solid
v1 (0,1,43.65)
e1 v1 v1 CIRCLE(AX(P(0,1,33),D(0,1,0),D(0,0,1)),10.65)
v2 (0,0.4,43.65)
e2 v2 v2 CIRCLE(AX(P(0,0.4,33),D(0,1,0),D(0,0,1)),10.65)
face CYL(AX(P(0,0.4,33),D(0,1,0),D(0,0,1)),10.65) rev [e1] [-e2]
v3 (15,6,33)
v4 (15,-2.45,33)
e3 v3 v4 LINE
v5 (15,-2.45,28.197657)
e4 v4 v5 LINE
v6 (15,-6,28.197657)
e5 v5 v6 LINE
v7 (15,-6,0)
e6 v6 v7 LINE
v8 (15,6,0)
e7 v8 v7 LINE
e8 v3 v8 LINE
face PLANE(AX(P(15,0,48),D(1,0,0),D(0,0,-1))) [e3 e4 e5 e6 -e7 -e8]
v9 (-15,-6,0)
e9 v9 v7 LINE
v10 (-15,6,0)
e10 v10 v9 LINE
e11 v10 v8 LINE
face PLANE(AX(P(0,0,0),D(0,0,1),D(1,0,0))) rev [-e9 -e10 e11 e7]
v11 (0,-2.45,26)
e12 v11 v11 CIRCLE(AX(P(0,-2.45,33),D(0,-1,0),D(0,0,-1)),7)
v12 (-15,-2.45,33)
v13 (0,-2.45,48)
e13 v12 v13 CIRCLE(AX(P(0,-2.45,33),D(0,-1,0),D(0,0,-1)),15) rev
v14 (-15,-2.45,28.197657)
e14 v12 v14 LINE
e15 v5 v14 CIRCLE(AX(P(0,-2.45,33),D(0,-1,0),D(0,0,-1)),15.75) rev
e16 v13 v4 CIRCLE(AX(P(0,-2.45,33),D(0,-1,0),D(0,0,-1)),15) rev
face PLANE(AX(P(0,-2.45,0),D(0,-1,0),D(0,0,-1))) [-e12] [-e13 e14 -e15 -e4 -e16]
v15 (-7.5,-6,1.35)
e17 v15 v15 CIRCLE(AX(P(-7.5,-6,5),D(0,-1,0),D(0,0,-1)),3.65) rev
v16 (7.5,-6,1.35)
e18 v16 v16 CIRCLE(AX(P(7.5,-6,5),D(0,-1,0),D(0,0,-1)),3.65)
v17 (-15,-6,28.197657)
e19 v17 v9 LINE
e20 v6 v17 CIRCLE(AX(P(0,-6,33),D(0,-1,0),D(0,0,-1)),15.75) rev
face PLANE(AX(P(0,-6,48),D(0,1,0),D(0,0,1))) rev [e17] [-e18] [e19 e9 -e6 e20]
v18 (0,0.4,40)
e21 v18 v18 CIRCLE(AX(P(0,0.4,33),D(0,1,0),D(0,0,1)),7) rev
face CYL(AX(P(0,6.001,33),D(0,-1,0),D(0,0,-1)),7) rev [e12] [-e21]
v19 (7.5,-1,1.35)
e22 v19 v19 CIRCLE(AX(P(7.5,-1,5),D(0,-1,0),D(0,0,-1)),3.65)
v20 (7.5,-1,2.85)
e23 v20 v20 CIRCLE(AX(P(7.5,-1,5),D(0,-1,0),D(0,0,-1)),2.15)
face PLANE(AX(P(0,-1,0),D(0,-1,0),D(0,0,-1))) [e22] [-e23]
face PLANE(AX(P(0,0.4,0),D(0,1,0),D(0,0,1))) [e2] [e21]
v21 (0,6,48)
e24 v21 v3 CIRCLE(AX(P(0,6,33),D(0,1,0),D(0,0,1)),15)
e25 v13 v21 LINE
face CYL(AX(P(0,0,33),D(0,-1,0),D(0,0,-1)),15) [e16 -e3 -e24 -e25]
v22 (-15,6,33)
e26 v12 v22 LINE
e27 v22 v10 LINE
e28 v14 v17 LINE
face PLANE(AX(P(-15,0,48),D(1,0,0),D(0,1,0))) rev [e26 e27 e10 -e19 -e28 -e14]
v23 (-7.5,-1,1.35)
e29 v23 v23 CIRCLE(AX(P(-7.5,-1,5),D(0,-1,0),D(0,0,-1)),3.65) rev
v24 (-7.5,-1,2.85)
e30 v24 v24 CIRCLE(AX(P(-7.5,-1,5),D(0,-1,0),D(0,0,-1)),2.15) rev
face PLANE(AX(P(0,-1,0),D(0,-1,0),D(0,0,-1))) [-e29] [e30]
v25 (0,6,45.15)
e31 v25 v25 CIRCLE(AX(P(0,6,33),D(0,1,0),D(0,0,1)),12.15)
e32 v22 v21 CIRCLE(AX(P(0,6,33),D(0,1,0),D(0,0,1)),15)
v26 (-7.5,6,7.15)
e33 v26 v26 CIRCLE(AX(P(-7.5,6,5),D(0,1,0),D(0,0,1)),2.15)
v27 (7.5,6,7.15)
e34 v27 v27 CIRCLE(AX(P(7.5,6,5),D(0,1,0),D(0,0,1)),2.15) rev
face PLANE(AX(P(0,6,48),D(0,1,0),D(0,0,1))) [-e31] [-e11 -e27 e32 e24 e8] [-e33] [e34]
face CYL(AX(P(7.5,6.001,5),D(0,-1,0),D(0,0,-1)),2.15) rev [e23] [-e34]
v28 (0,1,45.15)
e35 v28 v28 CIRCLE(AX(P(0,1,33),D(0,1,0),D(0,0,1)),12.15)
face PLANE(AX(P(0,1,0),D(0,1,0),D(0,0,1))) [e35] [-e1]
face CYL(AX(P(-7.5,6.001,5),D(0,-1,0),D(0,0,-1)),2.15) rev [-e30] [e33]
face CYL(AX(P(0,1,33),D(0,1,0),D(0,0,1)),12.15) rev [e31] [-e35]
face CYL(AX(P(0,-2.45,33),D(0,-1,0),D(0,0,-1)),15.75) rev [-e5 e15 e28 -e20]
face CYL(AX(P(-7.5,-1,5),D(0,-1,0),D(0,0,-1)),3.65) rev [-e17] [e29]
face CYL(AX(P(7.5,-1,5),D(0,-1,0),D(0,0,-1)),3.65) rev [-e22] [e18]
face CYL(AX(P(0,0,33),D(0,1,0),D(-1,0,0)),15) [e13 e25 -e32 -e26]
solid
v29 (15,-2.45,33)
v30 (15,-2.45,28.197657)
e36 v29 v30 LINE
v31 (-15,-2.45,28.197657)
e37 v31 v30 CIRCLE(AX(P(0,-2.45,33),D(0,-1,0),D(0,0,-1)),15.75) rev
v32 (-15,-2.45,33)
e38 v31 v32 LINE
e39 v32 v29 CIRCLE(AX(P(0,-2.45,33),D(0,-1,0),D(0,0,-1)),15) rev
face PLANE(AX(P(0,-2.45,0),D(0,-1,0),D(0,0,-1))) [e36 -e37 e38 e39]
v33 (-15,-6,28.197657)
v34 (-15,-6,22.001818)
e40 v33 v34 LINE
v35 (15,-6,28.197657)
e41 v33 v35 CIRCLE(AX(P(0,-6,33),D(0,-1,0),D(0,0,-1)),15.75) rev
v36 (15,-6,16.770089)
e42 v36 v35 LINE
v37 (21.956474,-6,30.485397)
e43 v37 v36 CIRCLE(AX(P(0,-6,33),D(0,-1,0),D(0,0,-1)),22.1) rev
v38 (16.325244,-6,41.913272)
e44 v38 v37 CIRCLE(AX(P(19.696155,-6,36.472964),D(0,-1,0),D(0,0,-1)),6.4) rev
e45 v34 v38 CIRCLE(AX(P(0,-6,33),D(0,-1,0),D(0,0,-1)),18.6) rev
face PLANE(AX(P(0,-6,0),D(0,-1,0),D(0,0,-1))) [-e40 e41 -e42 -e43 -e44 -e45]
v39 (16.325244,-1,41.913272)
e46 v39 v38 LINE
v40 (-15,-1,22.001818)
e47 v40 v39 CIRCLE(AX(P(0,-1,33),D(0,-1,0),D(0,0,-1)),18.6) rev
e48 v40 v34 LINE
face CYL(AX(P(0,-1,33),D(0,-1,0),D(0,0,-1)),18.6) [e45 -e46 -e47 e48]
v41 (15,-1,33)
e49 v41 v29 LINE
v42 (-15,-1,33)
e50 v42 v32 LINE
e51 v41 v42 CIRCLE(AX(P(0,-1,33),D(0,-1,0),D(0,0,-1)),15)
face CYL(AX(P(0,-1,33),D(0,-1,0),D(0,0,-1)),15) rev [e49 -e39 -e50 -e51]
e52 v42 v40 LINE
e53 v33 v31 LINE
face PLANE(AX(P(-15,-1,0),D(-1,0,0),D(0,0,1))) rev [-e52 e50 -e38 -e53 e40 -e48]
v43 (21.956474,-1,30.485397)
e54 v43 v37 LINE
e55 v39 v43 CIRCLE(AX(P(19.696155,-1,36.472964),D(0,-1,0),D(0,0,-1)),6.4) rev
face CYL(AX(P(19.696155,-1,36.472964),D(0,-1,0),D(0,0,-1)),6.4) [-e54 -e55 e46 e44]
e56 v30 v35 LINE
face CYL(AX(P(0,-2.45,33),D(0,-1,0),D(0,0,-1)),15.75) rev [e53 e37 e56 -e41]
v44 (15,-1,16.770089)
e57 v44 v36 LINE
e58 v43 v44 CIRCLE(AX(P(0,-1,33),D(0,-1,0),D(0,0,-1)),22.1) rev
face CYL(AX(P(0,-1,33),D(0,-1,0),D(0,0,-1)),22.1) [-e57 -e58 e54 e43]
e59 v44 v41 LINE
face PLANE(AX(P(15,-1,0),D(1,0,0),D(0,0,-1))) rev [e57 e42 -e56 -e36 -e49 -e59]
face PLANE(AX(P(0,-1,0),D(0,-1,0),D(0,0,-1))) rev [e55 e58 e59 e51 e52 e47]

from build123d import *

# Parameters (mm, degrees)
EXTRUDE_873_DEPTH      = 48
FILLET_1_R             = 15
SKETCH_2533_R          = 1
EXTRUDE_4839_DEPTH     = 5
SKETCH_1_4_R           = 15.75
CUT_EXTRUDE_5054_DEPTH = 3.55
SKETCH_1_5_R           = 2.15
SKETCH_1_5_R_2         = 7
CUT_EXTRUDE_5752_DEPTH = 12
SKETCH_5896_R          = 12.15
SKETCH_5896_R_2        = 10.65
CUT_EXTRUDE_6261_DEPTH = 5
SKETCH_2_3_R           = 10.65
CUT_EXTRUDE_6307_DEPTH = 5.6
SKETCH_7_R             = 2.15
SKETCH_7_R_2           = 3.65
CUT_EXTRUDE_6391_DEPTH = 5


with BuildPart() as part:
    # Sketch 353 → Extrude 873 (new body)
    with BuildSketch(Plane.XY):
        Polygon((-1e-08, 3.5), (-15, 3.5), (-15, -6), (15, -6), (15, 3.5), align=None)
        with BuildLine():
            Line((-15, 6), (-15, 3.5))
            Line((-15, 3.5), (-1e-08, 3.5))
            ThreePointArc((-1e-08, 3.5), (-4.330127024, 4.138593385), (-8.291561976, 6))
            Line((-8.291561976, 6), (-15, 6))
        make_face()
        with BuildLine():
            ThreePointArc((-8.291561976, 6), (-4.330127024, 4.138593385), (-1e-08, 3.5))
            ThreePointArc((-1e-08, 3.5), (4.330127014, 4.138593382), (8.291561976, 6))
            Line((8.291561976, 6), (-8.291561976, 6))
        make_face()
        with BuildLine():
            ThreePointArc((8.291561976, 6), (4.330127014, 4.138593382), (-1e-08, 3.5))
            Line((-1e-08, 3.5), (15, 3.5))
            Line((15, 3.5), (15, 6))
            Line((15, 6), (8.291561976, 6))
        make_face()
    extrude(amount=EXTRUDE_873_DEPTH)

    # Скругление1
    fillet_1_edges = [part.edges().sort_by_distance(p)[0] for p in [
        (-15, 0, 48),
        (15, 0, 48),
    ]]
    fillet(fillet_1_edges, radius=FILLET_1_R - 0.0001)  # a hair under: the kernel refuses the full size


with BuildPart() as body_2:
    # Sketch 2533 → Extrude 4839 (new body)
    # profile 1 of 5: a face of its own
    with BuildSketch(Plane.XZ.offset(6)):
        with BuildLine():
            Line((-15, 22.001818332), (-15, 23.793480571))
            ThreePointArc((-15, 23.793480571), (-8.310689955, 48.514265451), (15.975091459, 40.386234011))
            ThreePointArc((15.975091459, 40.386234011), (24.423228184, 39.083476852), (21.026417078, 31.239379412))
            ThreePointArc((21.026417078, 31.239379412), (19.163501403, 24.169925597), (15, 18.160525616))
            Line((15, 18.160525616), (15, 16.770089341))
            ThreePointArc((15, 16.770089341), (19.709709926, 23.003133759), (21.956474455, 30.485396749))
            ThreePointArc((21.956474455, 30.485396749), (25.437011886, 39.301843704), (16.325243686, 41.913272047))
            ThreePointArc((16.325243686, 41.913272047), (-9.977753503, 48.697274764), (-15, 22.001818332))
        make_face()
    # profile 2 of 5: a face of its own
    with BuildSketch(Plane.XZ.offset(6)):
        with BuildLine():
            Line((-15, 23.793480571), (-15, 28.197656822))
            ThreePointArc((-15, 28.197656822), (-2.430277762, 48.561370441), (15.75, 33))
            ThreePointArc((15.75, 33), (15.561370441, 30.569722238), (15, 28.197656822))
            Line((15, 28.197656822), (15, 18.160525616))
            ThreePointArc((15, 18.160525616), (19.163501403, 24.169925597), (21.026417078, 31.239379412))
            ThreePointArc((21.026417078, 31.239379412), (24.423228184, 39.083476852), (15.975091459, 40.386234011))
            ThreePointArc((15.975091459, 40.386234011), (-8.310689955, 48.514265451), (-15, 23.793480571))
        make_face()
        with BuildLine():
            ThreePointArc((18.566239786, 34.242875781), (16.249327925, 35.865194932), (17.871647075, 38.182106793))
            Line((17.871647075, 38.182106793), (20.826070334, 38.703051326))
            ThreePointArc((20.826070334, 38.703051326), (23.142982196, 37.080732175), (21.520663045, 34.763820314))
            Line((21.520663045, 34.763820314), (18.566239786, 34.242875781))
        make_face(mode=Mode.SUBTRACT)
    # profile 3 of 5: a face of its own
    with BuildSketch(Plane.XZ.offset(6)):
        with BuildLine():
            ThreePointArc((20.826070334, 38.703051326), (23.142982196, 37.080732175), (21.520663045, 34.763820314))
            Line((21.520663045, 34.763820314), (18.566239786, 34.242875781))
            ThreePointArc((18.566239786, 34.242875781), (16.249327925, 35.865194932), (17.871647075, 38.182106793))
            Line((17.871647075, 38.182106793), (20.826070334, 38.703051326))
        make_face()
        with Locations((19.69615506, 36.472963553)):
            Circle(SKETCH_2533_R, mode=Mode.SUBTRACT)
    # profile 4 of 5: a face of its own
    with BuildSketch(Plane.XZ.offset(6)):
        with BuildLine():
            Line((-15, 28.197656822), (-15, 33))
            ThreePointArc((-15, 33), (-10.606601718, 43.606601718), (0, 48))
            ThreePointArc((0, 48), (10.606601718, 43.606601718), (15, 33))
            Line((15, 33), (15, 28.197656822))
            ThreePointArc((15, 28.197656822), (15.561370441, 30.569722238), (15.75, 33))
            ThreePointArc((15.75, 33), (-2.430277762, 48.561370441), (-15, 28.197656822))
        make_face()
    # profile 5 of 5: a face of its own
    with BuildSketch(Plane.XZ.offset(6)):
        with Locations((19.69615506, 36.472963553)):
            Circle(SKETCH_2533_R)
    extrude(amount=-EXTRUDE_4839_DEPTH)


with BuildPart() as cut_extrude_5054_tool:
    # Эскиз1<4> → Cut-Extrude 5054 (new body)
    with BuildSketch(Plane.XZ.offset(6)):
        with Locations((0, 33)):
            Circle(SKETCH_1_4_R)
    extrude(amount=-CUT_EXTRUDE_5054_DEPTH)


with BuildPart() as part_1:
    add(part.part)

    # Cut-Extrude 5054: cut by cut_extrude_5054_tool
    add(cut_extrude_5054_tool.part, mode=Mode.SUBTRACT)

    # Sketch 1_5 → Cut-Extrude 5752 (cut)
    with BuildSketch(Plane.XZ.offset(6)):
        with Locations(Location((7.5, 5, 0), (0, 0, 270))):
            Circle(SKETCH_1_5_R)
        with Locations(Location((-7.5, 5, 0), (0, 0, 270))):
            Circle(SKETCH_1_5_R)
        with Locations(Location((0, 33, 0), (0, 0, 270))):
            Circle(SKETCH_1_5_R_2)
    extrude(amount=-CUT_EXTRUDE_5752_DEPTH, mode=Mode.SUBTRACT)

    # Sketch 5896 → Cut-Extrude 6261 (cut)
    with BuildSketch(Plane(origin=(0, 6, 0), x_dir=(1, 0, 0), z_dir=(0, 1, 0))):
        with Locations(Location((0, -33, 0), (0, 0, 270))):
            Circle(SKETCH_5896_R)
        with Locations(Location((0, -33, 0), (0, 0, 270))):
            Circle(SKETCH_5896_R_2, mode=Mode.SUBTRACT)
    extrude(amount=-CUT_EXTRUDE_6261_DEPTH, mode=Mode.SUBTRACT)

    # Sketch 2_3 → Cut-Extrude 6307 (cut)
    with BuildSketch(Plane(origin=(0, 6, 0), x_dir=(1, 0, 0), z_dir=(0, 1, 0))):
        with Locations(Location((0, -33, 0), (0, 0, 270))):
            Circle(SKETCH_2_3_R)
    extrude(amount=-CUT_EXTRUDE_6307_DEPTH, mode=Mode.SUBTRACT)

    # Эскиз под резистор<7> → Cut-Extrude 6391 (cut)
    # profile 1 of 3: a face of its own
    with BuildSketch(Plane.XZ.offset(6)):
        with BuildLine():
            ThreePointArc((-6.250710878, 8.429544677), (-7.551544535, 8.271665699), (-8.856706058, 8.388487667))
            ThreePointArc((-8.856706058, 8.388487667), (-9.545791154, 1.977213445), (-3.85, 5))
            ThreePointArc((-3.85, 5), (-4.509815617, 7.09315488), (-6.250710878, 8.429544677))
        make_face()
        with Locations(Location((-7.5, 5, 0), (0, 0, 270))):
            Circle(SKETCH_7_R, mode=Mode.SUBTRACT)
    # profile 2 of 3: a face of its own
    with BuildSketch(Plane.XZ.offset(6)):
        with BuildLine():
            ThreePointArc((-6.250710878, 8.429544677), (-7.557497992, 8.649547093), (-8.856706058, 8.388487667))
            ThreePointArc((-8.856706058, 8.388487667), (-7.551544535, 8.271665699), (-6.250710878, 8.429544677))
        make_face()
    # profile 3 of 3: a face of its own
    with BuildSketch(Plane.XZ.offset(6)):
        with Locations(Location((7.5, 5, 0), (0, 0, 270))):
            Circle(SKETCH_7_R_2)
        with Locations(Location((7.5, 5, 0), (0, 0, 270))):
            Circle(SKETCH_7_R, mode=Mode.SUBTRACT)
    extrude(amount=-CUT_EXTRUDE_6391_DEPTH, mode=Mode.SUBTRACT)


with BuildPart() as body_2_1:
    add(body_2.part)

    # Cut-Extrude 5054: cut by cut_extrude_5054_tool
    add(cut_extrude_5054_tool.part, mode=Mode.SUBTRACT)


solid = Compound([part_1.part, body_2_1.part])
